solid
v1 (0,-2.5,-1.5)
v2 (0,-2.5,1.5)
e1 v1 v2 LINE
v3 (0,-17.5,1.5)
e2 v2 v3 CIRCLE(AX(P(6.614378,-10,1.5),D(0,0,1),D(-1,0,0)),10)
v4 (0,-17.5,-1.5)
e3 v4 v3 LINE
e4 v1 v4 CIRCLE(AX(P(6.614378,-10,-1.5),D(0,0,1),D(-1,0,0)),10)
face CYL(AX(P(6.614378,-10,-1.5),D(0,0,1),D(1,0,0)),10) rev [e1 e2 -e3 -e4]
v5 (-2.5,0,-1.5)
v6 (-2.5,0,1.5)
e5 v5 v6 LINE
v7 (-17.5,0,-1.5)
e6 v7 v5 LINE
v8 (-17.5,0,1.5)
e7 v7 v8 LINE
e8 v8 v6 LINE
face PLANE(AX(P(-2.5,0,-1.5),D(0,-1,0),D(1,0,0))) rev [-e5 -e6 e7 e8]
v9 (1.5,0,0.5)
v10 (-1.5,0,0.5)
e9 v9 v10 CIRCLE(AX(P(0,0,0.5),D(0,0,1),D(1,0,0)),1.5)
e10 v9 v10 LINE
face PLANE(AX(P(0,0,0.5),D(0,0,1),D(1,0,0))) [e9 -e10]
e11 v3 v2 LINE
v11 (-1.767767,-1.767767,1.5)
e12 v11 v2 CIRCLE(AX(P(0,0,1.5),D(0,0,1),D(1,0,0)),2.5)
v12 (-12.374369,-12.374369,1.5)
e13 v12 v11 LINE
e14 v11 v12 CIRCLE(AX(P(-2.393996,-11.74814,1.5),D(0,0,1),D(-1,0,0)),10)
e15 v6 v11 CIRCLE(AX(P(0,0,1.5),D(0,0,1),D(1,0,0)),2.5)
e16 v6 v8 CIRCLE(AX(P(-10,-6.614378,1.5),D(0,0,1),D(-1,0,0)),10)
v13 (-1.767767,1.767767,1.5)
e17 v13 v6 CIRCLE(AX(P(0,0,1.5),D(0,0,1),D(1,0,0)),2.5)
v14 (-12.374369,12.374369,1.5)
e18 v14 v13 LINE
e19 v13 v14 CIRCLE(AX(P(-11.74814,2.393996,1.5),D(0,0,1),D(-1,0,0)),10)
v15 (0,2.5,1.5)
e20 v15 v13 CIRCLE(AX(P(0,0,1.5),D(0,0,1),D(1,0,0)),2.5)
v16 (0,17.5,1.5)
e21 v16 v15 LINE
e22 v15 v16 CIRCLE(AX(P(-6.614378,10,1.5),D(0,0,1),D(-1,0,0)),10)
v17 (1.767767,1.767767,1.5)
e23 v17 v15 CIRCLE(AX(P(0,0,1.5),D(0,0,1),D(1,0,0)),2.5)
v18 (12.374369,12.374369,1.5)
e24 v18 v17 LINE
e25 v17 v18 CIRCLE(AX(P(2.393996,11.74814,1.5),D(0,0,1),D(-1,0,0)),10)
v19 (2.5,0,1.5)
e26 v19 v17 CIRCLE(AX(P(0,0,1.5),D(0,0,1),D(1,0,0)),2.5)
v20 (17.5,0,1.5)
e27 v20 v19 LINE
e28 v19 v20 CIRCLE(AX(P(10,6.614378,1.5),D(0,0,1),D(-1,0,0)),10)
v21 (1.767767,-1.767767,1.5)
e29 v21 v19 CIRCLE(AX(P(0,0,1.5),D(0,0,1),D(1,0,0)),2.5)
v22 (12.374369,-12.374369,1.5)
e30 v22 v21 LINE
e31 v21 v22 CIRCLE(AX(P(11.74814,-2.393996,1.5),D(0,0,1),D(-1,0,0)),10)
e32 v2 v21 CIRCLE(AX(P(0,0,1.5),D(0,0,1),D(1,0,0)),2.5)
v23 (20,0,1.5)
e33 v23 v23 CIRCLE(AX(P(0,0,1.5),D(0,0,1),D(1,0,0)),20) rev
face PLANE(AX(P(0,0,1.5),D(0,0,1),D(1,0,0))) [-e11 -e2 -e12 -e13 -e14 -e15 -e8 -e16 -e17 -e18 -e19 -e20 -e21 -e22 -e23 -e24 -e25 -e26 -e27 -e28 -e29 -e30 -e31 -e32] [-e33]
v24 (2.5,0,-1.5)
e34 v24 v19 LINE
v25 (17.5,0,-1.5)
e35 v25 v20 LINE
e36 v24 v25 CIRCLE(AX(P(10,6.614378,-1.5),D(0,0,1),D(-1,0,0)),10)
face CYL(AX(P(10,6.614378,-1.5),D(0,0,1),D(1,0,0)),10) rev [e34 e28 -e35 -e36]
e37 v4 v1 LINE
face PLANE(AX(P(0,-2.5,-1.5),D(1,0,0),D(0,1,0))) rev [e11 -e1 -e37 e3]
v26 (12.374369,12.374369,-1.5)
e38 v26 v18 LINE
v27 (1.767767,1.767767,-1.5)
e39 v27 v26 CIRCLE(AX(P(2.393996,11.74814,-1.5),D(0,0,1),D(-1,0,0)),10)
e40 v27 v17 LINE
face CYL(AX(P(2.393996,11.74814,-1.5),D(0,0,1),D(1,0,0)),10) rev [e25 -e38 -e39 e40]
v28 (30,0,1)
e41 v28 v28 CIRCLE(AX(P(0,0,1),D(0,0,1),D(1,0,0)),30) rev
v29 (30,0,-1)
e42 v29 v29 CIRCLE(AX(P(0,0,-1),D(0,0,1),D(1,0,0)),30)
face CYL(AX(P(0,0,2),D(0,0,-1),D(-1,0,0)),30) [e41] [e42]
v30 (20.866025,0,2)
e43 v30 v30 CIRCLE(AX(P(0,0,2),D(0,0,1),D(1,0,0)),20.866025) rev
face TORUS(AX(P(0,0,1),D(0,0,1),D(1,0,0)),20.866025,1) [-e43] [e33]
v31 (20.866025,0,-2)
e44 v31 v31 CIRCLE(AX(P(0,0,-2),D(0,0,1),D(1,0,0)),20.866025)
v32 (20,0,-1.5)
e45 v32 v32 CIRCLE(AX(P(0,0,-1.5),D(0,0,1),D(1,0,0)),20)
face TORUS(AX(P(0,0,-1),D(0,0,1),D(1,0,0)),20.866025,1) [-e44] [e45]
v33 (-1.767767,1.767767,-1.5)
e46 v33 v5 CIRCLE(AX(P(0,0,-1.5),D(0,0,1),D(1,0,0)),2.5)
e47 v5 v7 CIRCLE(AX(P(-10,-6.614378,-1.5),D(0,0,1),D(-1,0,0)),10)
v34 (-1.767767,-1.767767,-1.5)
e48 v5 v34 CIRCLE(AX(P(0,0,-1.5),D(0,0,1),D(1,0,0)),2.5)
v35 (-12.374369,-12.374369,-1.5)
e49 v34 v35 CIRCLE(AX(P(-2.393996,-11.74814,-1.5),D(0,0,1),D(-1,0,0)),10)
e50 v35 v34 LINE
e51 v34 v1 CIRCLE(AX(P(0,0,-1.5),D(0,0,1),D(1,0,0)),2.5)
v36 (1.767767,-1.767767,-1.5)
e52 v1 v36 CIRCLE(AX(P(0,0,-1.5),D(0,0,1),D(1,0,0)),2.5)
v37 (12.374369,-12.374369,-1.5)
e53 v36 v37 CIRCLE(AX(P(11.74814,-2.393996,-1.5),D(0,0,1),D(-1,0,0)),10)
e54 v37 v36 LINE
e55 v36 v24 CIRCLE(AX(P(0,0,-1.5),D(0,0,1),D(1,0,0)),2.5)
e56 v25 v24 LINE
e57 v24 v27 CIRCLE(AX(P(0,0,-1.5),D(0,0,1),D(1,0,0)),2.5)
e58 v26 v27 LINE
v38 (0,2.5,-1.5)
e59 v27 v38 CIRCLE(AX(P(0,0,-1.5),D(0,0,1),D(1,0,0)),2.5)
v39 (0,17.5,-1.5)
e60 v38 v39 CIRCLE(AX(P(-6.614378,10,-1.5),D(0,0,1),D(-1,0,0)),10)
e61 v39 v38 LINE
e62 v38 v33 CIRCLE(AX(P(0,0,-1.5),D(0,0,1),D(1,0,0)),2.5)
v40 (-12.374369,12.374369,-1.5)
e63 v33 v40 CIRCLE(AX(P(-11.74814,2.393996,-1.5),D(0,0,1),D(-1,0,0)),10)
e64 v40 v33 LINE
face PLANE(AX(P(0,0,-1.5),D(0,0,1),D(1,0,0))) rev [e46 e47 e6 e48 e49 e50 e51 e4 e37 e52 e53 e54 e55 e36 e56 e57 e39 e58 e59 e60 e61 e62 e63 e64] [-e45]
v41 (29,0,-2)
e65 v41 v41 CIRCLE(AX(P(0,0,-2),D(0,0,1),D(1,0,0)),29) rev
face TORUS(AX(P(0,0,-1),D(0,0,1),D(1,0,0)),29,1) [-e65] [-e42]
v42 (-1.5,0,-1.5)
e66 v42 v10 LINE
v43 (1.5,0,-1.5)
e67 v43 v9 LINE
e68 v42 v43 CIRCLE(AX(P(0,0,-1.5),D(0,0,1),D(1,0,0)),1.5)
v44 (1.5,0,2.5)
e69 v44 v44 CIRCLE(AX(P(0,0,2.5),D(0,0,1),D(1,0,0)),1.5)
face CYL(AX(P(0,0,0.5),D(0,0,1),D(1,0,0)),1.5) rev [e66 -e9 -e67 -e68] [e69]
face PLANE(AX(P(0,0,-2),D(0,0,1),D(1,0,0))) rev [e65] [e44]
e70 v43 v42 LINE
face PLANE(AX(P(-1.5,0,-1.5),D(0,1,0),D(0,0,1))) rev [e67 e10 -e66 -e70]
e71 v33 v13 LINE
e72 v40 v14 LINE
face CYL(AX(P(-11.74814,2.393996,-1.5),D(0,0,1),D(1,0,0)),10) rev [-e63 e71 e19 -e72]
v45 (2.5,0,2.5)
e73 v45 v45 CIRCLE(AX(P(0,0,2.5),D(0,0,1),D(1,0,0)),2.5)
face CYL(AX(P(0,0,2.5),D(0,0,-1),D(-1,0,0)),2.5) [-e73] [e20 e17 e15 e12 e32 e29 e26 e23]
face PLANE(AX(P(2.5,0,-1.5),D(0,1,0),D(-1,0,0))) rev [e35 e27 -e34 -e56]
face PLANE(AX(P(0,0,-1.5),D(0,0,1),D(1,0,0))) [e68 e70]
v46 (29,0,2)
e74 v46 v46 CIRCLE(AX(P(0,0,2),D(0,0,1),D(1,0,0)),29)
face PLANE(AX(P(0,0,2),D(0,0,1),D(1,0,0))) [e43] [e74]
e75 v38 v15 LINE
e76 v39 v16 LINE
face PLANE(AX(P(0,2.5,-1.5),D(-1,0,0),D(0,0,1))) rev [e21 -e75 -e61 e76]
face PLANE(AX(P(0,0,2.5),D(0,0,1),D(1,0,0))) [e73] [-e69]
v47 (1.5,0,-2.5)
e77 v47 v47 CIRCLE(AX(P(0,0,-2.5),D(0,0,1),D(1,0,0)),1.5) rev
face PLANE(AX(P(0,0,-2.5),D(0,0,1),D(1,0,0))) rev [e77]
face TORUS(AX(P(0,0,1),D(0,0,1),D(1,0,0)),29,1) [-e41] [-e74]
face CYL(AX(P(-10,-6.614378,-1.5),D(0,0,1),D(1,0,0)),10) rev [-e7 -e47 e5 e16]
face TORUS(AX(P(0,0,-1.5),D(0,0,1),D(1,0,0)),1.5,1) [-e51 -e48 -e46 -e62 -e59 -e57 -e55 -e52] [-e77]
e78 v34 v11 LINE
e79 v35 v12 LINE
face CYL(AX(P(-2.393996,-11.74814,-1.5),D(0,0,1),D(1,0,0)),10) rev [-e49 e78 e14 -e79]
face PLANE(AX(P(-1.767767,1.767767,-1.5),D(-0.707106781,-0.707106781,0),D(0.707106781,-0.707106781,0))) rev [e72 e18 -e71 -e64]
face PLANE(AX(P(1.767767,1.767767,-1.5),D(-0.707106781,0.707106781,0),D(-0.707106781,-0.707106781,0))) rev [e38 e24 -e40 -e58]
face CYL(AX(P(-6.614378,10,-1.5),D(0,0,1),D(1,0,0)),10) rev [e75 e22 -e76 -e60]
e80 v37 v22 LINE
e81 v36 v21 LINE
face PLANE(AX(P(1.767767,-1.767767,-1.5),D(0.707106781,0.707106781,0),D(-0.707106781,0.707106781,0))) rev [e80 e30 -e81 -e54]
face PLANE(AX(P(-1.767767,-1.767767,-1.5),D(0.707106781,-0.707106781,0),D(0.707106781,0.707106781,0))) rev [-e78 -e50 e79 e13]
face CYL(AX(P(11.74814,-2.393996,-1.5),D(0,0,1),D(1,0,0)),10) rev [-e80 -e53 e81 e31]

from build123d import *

# Parameters (mm, degrees)
SKETCH1_R           = 2.5
BOSS_EXTRUDE5_DEPTH = 2.5
SKETCH7_R           = 20
BOSS_EXTRUDE6_DEPTH = 1.5
CUT_EXTRUDE5_DEPTH  = 3
SKETCH9_R           = 30
SKETCH9_R_2         = 20
BOSS_EXTRUDE8_DEPTH = 2
SKETCH10_R          = 1.5
CUT_EXTRUDE6_DEPTH  = 2
CUT_EXTRUDE7_DEPTH  = 2
FILLET1_R           = 1
FILLET2_R           = 1


# Some blends are built 0.0001 mm under size
with BuildPart() as part:
    # Sketch1 → Boss-Extrude5 (new, symmetric)
    with BuildSketch(Plane.XY):
        Circle(SKETCH1_R)
    extrude(amount=BOSS_EXTRUDE5_DEPTH, both=True)

    # Sketch7 → Boss-Extrude6 (add, symmetric)
    with BuildSketch(Plane.XY):
        Circle(SKETCH7_R)
    extrude(amount=BOSS_EXTRUDE6_DEPTH, both=True)

    # Sketch8 → Cut-Extrude5 (cut)
    with BuildSketch(Plane.XY.offset(1.5)):
        with BuildLine():
            Line((0, 2.5), (0, 17.5))
            ThreePointArc((0, 17.5), (3.385621722, 10), (0, 2.5))
        make_face()
        with BuildLine():
            Line((1.767766953, 1.767766953), (12.374368671, 12.374368671))
            ThreePointArc((12.374368671, 12.374368671), (9.46506389, 4.677071733), (1.767766953, 1.767766953))
        make_face()
        with BuildLine():
            Line((2.5, 0), (17.5, 0))
            ThreePointArc((17.5, 0), (10, -3.385621722), (2.5, 0))
        make_face()
        with BuildLine():
            Line((1.767766953, -1.767766953), (12.374368671, -12.374368671))
            ThreePointArc((12.374368671, -12.374368671), (4.677071733, -9.46506389), (1.767766953, -1.767766953))
        make_face()
        with BuildLine():
            Line((0, -2.5), (0, -17.5))
            ThreePointArc((0, -17.5), (-3.385621722, -10), (0, -2.5))
        make_face()
        with BuildLine():
            Line((-1.767766953, -1.767766953), (-12.374368671, -12.374368671))
            ThreePointArc((-12.374368671, -12.374368671), (-9.46506389, -4.677071733), (-1.767766953, -1.767766953))
        make_face()
        with BuildLine():
            Line((-2.5, 0), (-17.5, 0))
            ThreePointArc((-17.5, 0), (-10, 3.385621722), (-2.5, 0))
        make_face()
        with BuildLine():
            Line((-1.767766953, 1.767766953), (-12.374368671, 12.374368671))
            ThreePointArc((-12.374368671, 12.374368671), (-4.677071733, 9.46506389), (-1.767766953, 1.767766953))
        make_face()
    extrude(amount=-CUT_EXTRUDE5_DEPTH, mode=Mode.SUBTRACT)

    # Sketch9 → Boss-Extrude8 (add, symmetric)
    with BuildSketch(Plane.XY):
        Circle(SKETCH9_R)
        Circle(SKETCH9_R_2, mode=Mode.SUBTRACT)
    extrude(amount=BOSS_EXTRUDE8_DEPTH, both=True)

    # Sketch10 → Cut-Extrude6 (cut)
    with BuildSketch(Plane.XY.offset(2.5)):
        Circle(SKETCH10_R)
    extrude(amount=-CUT_EXTRUDE6_DEPTH, mode=Mode.SUBTRACT)

    # Sketch11 → Cut-Extrude7 (cut)
    with BuildSketch(Plane.XY.offset(0.5)):
        with BuildLine():
            Line((-1.5, 0), (1.5, 0))
            ThreePointArc((1.5, 0), (0, -1.5), (-1.5, 0))
        make_face()
    extrude(amount=-CUT_EXTRUDE7_DEPTH, mode=Mode.SUBTRACT)

    # Fillet1
    fillet1_edges = [part.edges().sort_by_distance(p)[0] for p in [
        (-2.5, 0, -2.5),
    ]]
    fillet(fillet1_edges, radius=FILLET1_R - 0.0001)  # a hair under: the kernel refuses the full size

    # Fillet2
    # the kernel refuses this fillet: 1 mm, written as the material it takes off along each edge
    with BuildSketch(Plane(origin=(0, 0, 2), x_dir=(1, 0, 0), z_dir=(0, -1, 0))) as fillet2_piece_1:
        with BuildLine():
            CenterArc((30 - FILLET2_R, -FILLET2_R), FILLET2_R, 0, 90)
            Line((30 - FILLET2_R, 0), (30 - FILLET2_R, FILLET2_R * 0.02))
            Line((30 - FILLET2_R, FILLET2_R * 0.02), (30 + FILLET2_R * 0.02, FILLET2_R * 0.02))
            Line((30 + FILLET2_R * 0.02, FILLET2_R * 0.02), (30 + FILLET2_R * 0.02, -FILLET2_R))
            Line((30 + FILLET2_R * 0.02, -FILLET2_R), (30, -FILLET2_R))
        make_face()
    revolve(axis=Axis((0, 0, 2), (0, 0, 1)), mode=Mode.SUBTRACT)
    with BuildSketch(Plane(origin=(0, 0, -2), x_dir=(1, 0, 0), z_dir=(0, -1, 0))) as fillet2_piece_2:
        with BuildLine():
            CenterArc((20.866025404, 1), FILLET2_R, 210, 60)
            Line((20.866025404, 0), (20.866025404, -0.02))
            Line((20.866025404, -0.02), (20, -0.02))
            Line((20, -0.02), (19.98, 0))
            ThreePointArc((19.98, 0), (19.98, 0.25), (19.982679492, 0.49))
            Line((19.982679492, 0.49), (20, 0.5))
        make_face()
    revolve(axis=Axis((0, 0, -2), (0, 0, 1)), mode=Mode.SUBTRACT)
    with BuildSketch(Plane(origin=(0, 0, -2), x_dir=(1, 0, 0), z_dir=(0, -1, 0))) as fillet2_piece_3:
        with BuildLine():
            CenterArc((30 - FILLET2_R, FILLET2_R), FILLET2_R, 270, 90)
            Line((30, FILLET2_R), (30 + FILLET2_R * 0.02, FILLET2_R))
            Line((30 + FILLET2_R * 0.02, FILLET2_R), (30 + FILLET2_R * 0.02, -FILLET2_R * 0.02))
            Line((30 + FILLET2_R * 0.02, -FILLET2_R * 0.02), (30 - FILLET2_R, -FILLET2_R * 0.02))
            Line((30 - FILLET2_R, -FILLET2_R * 0.02), (30 - FILLET2_R, 0))
        make_face()
    revolve(axis=Axis((0, 0, -2), (0, 0, 1)), mode=Mode.SUBTRACT)
    with BuildSketch(Plane(origin=(0, 0, 2), x_dir=(1, 0, 0), z_dir=(0, -1, 0))) as fillet2_piece_4:
        with BuildLine():
            CenterArc((20.866025404, -1), FILLET2_R, 90, 60)
            Line((20.866025404, 0), (20.866025404, 0.02))
            Line((20.866025404, 0.02), (20, 0.02))
            Line((20, 0.02), (19.98, 0))
            ThreePointArc((19.98, 0), (19.98, -0.25), (19.982679492, -0.49))
            Line((19.982679492, -0.49), (20, -0.5))
        make_face()
    revolve(axis=Axis((0, 0, 2), (0, 0, 1)), mode=Mode.SUBTRACT)


solid = part.part
